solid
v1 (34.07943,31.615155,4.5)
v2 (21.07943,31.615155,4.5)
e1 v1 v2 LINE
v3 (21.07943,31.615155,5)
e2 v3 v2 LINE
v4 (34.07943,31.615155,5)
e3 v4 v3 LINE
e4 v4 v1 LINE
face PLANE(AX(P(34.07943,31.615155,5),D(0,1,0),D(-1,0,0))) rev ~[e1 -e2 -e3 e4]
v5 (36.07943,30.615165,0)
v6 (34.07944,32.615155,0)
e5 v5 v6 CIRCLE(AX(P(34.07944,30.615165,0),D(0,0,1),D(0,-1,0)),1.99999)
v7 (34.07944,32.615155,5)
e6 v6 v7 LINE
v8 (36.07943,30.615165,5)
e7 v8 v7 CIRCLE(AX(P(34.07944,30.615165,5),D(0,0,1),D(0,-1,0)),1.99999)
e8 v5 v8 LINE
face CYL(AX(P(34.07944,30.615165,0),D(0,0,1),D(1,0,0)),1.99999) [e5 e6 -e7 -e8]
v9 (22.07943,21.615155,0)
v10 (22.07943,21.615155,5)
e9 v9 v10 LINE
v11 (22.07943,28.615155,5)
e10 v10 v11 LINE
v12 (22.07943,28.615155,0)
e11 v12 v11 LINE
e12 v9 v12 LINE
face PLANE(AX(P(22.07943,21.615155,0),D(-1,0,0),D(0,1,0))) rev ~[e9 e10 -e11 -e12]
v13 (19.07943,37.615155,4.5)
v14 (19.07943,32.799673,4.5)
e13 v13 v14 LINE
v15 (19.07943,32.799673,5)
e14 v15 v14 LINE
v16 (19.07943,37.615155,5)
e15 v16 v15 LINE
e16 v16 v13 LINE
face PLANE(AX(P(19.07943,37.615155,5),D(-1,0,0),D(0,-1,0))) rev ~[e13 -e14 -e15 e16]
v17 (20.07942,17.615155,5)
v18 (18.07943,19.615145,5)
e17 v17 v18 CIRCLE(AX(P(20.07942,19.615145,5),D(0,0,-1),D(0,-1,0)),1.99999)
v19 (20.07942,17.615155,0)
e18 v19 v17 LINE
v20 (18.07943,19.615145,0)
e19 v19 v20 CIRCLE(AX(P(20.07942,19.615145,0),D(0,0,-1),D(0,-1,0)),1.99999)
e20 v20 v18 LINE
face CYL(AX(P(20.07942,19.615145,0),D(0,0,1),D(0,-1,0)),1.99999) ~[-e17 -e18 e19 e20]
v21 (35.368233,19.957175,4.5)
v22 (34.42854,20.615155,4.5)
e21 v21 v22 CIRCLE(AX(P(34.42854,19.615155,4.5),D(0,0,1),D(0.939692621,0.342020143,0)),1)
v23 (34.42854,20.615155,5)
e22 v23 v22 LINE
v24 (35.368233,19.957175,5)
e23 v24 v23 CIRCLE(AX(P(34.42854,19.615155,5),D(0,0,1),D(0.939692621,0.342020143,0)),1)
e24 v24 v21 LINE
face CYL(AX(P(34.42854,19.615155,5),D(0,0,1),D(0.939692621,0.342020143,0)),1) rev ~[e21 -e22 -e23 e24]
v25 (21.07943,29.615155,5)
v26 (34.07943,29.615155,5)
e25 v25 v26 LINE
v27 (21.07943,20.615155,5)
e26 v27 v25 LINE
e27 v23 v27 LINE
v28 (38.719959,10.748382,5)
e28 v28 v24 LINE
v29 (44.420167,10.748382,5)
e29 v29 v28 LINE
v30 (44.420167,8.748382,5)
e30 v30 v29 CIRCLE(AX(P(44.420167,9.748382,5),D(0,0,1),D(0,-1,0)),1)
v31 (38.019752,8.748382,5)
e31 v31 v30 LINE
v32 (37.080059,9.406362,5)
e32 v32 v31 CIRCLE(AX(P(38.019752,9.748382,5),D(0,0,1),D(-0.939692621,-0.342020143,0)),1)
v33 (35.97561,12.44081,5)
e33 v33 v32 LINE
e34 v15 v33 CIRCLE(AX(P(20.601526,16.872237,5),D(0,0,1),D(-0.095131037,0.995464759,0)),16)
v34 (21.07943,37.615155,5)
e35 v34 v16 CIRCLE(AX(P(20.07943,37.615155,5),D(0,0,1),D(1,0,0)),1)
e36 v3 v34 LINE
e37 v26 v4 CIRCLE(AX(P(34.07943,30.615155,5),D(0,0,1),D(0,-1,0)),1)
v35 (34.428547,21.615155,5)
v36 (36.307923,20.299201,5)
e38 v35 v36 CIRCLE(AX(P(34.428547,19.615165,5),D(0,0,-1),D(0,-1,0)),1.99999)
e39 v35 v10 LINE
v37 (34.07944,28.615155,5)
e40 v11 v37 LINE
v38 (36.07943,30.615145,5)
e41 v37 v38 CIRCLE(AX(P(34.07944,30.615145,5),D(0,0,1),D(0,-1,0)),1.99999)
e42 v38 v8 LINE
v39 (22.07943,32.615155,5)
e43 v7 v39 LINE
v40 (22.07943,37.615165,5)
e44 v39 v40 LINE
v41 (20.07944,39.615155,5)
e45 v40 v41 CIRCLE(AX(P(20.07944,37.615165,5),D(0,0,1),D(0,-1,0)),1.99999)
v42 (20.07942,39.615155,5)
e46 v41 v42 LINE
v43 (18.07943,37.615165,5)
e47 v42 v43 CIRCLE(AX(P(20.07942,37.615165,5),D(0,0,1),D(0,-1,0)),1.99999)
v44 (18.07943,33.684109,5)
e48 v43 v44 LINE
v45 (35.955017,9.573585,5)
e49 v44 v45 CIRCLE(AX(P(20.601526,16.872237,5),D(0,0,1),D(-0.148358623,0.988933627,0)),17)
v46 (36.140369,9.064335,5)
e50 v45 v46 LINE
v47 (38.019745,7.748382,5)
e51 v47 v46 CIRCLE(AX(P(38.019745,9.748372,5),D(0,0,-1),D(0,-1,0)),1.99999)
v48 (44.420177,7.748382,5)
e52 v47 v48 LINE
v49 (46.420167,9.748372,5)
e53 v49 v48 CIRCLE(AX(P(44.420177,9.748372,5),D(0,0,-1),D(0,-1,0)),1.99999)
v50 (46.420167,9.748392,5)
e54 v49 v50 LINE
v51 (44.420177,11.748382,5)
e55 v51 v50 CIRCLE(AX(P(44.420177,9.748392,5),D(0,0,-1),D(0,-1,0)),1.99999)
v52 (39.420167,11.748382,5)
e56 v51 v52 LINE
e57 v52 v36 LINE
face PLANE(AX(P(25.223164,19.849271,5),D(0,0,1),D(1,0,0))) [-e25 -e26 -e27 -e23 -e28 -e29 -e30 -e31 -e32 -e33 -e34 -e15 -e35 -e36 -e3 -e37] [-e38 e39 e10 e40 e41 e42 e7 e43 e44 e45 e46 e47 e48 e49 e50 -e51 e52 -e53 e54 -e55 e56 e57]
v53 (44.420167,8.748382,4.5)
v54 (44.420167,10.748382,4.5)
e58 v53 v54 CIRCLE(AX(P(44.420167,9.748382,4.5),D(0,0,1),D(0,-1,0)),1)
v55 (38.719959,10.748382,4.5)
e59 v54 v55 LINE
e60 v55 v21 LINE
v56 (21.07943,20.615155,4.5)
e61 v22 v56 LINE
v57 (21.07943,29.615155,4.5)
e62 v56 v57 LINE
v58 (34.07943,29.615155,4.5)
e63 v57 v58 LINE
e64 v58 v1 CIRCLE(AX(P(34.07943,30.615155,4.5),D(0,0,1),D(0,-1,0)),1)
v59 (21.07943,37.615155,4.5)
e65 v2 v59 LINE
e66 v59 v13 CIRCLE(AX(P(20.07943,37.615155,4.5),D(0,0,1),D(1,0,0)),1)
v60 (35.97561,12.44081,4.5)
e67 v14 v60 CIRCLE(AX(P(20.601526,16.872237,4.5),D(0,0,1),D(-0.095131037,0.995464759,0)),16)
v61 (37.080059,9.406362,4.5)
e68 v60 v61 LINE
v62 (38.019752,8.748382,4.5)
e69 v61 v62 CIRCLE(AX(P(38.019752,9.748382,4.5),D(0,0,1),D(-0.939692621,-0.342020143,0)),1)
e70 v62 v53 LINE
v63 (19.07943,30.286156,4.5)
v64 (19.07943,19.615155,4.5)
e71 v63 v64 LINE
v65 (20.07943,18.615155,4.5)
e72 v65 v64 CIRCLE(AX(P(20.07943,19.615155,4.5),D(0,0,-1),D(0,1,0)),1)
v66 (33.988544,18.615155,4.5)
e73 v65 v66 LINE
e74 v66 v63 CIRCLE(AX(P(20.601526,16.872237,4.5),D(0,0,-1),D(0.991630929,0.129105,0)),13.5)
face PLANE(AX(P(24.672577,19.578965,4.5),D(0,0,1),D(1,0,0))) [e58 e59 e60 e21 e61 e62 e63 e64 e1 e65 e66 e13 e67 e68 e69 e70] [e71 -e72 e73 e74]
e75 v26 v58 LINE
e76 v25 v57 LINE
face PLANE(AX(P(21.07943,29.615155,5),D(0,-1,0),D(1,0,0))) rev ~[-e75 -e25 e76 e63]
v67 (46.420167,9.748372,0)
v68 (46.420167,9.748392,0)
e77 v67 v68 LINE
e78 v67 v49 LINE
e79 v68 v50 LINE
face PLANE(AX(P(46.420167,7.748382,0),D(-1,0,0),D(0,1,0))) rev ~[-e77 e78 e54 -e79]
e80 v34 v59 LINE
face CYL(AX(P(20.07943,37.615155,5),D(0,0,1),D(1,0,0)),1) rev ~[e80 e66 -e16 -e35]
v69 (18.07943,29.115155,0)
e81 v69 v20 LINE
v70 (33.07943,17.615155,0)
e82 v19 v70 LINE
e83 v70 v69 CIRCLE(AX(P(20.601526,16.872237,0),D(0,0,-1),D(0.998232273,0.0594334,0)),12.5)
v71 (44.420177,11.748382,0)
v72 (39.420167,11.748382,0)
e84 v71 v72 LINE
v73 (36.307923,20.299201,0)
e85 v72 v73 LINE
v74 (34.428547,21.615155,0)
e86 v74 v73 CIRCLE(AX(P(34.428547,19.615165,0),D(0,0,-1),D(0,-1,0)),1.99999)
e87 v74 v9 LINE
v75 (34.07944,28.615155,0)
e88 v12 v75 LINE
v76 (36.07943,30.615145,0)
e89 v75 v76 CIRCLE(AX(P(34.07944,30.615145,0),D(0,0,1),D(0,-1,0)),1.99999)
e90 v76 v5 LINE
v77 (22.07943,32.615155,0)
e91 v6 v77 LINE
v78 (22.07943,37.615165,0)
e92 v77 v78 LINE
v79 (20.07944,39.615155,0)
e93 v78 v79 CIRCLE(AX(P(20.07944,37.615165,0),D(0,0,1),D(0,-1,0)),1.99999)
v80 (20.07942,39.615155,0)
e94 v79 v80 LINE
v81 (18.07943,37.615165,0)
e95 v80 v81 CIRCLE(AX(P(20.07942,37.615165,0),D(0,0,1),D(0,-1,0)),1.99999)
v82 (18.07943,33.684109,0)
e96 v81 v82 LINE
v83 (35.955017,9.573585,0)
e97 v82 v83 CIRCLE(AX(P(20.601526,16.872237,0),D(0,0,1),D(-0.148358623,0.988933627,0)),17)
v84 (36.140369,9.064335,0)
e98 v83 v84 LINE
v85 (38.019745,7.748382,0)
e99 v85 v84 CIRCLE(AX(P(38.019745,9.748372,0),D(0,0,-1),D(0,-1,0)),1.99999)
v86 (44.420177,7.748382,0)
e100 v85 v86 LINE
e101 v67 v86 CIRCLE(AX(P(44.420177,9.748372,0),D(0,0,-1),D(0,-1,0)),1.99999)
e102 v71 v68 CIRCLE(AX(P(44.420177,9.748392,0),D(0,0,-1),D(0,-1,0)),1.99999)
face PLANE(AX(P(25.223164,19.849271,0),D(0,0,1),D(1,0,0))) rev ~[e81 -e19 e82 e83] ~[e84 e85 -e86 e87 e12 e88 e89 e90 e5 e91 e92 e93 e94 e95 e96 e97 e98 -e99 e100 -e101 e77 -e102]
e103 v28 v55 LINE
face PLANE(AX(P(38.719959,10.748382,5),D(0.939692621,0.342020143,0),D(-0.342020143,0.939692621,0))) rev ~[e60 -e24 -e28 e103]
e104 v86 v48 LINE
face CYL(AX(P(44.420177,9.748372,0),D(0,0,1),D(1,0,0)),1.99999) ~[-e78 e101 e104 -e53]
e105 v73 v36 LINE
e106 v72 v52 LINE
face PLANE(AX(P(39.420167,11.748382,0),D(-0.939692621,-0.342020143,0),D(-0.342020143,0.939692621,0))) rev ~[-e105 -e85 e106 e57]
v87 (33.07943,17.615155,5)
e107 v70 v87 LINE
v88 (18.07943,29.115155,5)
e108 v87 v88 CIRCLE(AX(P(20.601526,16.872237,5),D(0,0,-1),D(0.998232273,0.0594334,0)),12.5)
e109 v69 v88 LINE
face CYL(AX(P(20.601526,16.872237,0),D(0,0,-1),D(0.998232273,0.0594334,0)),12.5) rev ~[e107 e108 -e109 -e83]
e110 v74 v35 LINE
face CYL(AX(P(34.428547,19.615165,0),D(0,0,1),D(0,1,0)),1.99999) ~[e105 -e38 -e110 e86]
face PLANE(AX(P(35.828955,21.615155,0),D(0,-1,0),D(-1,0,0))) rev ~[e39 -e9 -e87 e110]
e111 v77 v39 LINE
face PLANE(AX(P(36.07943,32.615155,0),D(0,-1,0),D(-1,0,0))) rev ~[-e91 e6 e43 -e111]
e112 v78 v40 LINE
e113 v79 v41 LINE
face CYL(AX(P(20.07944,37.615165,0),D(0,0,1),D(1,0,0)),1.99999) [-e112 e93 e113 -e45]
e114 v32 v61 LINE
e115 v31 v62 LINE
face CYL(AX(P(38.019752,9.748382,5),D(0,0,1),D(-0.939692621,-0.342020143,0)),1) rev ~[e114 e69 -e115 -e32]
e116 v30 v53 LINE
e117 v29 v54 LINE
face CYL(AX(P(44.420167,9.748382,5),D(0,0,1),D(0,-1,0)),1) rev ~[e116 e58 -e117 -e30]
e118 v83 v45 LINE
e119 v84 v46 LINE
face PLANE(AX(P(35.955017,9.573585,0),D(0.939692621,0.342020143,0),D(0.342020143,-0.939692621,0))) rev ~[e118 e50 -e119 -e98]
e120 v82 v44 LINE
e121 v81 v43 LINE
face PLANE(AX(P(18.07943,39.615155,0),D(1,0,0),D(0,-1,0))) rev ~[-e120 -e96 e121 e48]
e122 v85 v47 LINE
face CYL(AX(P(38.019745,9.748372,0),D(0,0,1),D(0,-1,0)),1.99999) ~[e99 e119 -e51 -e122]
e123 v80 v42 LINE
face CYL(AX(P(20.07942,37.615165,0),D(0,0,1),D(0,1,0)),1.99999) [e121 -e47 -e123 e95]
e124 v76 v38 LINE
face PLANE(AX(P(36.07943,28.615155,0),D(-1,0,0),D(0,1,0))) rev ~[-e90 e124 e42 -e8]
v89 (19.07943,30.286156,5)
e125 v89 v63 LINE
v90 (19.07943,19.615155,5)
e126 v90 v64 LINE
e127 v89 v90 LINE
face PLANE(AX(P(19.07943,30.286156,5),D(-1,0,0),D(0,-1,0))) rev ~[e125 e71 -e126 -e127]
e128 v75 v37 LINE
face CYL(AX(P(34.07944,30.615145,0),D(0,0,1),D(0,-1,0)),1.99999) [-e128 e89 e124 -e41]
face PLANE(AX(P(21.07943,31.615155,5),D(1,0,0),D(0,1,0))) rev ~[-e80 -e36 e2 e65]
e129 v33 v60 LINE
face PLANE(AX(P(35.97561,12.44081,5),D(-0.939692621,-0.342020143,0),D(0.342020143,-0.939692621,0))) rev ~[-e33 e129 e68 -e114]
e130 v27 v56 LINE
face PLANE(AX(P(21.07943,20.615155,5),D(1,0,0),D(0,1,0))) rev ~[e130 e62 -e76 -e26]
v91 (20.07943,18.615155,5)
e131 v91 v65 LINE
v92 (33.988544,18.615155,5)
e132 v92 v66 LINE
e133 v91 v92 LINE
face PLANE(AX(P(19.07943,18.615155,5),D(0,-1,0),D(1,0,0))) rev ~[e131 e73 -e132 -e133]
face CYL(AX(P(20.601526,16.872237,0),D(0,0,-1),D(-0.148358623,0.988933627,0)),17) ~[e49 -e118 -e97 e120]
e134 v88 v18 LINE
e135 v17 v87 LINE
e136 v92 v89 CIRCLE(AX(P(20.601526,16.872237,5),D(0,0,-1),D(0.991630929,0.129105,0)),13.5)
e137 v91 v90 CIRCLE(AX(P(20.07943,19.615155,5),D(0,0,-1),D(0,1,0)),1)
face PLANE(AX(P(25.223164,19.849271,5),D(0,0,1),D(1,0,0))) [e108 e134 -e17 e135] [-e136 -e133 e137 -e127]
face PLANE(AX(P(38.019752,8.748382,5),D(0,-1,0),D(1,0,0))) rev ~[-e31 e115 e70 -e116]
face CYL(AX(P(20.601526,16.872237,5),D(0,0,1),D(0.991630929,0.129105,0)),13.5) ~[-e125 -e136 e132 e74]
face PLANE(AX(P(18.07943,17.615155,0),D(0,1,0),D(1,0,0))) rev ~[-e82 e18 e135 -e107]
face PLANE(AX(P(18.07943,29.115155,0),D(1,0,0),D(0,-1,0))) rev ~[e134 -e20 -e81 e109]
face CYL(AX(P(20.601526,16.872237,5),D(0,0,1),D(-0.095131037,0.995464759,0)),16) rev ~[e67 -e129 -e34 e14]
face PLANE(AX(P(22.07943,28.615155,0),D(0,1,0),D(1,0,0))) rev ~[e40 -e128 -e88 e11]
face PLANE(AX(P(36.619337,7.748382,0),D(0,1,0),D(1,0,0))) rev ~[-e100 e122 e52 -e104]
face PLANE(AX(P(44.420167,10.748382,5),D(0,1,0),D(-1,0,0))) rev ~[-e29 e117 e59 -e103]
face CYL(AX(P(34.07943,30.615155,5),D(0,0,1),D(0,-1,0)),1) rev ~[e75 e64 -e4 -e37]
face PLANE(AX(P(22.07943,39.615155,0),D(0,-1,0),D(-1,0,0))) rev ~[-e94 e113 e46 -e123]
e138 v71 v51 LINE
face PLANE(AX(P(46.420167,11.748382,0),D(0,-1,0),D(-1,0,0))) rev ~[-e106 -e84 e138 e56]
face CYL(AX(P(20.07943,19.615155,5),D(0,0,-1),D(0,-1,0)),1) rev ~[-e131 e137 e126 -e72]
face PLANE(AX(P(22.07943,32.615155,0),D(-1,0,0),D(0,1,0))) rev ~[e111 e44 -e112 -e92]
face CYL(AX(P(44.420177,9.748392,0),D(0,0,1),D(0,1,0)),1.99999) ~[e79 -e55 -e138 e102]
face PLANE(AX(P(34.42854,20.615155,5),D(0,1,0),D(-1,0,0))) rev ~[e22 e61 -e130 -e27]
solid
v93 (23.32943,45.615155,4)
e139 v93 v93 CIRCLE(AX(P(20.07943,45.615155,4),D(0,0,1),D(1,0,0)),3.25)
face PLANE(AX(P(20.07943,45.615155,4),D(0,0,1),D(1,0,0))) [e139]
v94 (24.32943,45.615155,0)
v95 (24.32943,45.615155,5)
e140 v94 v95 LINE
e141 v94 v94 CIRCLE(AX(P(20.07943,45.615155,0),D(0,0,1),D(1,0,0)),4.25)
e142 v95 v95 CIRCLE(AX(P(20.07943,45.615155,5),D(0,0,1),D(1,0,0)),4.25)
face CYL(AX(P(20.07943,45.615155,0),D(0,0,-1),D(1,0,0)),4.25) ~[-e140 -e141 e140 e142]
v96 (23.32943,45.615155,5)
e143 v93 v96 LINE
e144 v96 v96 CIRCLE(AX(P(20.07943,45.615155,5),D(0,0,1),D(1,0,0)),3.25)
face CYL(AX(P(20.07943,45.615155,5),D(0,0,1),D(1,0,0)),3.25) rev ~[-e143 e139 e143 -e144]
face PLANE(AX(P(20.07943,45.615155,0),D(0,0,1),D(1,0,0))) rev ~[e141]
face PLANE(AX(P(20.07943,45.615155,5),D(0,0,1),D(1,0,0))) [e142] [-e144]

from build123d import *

# Parameters (mm, degrees)
F1_DEPTH = 5
F0_R     = 4.25
F2_R     = 1.99999
F3_R     = 3.25
F4_DEPTH = 0.5
F5_R     = 1
F6_R     = 3.25
F7_DEPTH = 1


# Not quite as in the source:
# - a fillet or chamfer is up to 0.001 mm smaller than in the source, because OpenCascade refuses the exact size


with BuildPart() as f1:
    # F0 (on Top) → F1 (new body)
    with BuildSketch(Plane.XY):
        with BuildLine():
            Line((35.8289553412, 21.6151545151), (22.0794297924, 21.6151545151))
            Line((22.0794297924, 21.6151545151), (22.0794297924, 28.6151545151))
            Line((22.0794297924, 28.6151545151), (36.0794297924, 28.6151545151))
            Line((36.0794297924, 28.6151545151), (36.0794297924, 32.6151545151))
            Line((36.0794297924, 32.6151545151), (22.0794297924, 32.6151545151))
            Line((22.0794297924, 32.6151545151), (22.0794297924, 39.6151545151))
            Line((22.0794297924, 39.6151545151), (18.0794297924, 39.6151545151))
            Line((18.0794297924, 39.6151545151), (18.0794297924, 33.6841086822))
            ThreePointArc((18.0794297924, 33.6841086822), (6.9453736492, 6.7475398575), (35.9550171357, 9.5735849806))
            Line((35.9550171357, 9.5735849806), (36.6193366933, 7.7483819969))
            Line((36.6193366933, 7.7483819969), (46.4201668461, 7.7483819969))
            Line((46.4201668461, 7.7483819969), (46.4201668461, 11.7483819969))
            Line((46.4201668461, 11.7483819969), (39.4201668461, 11.7483819969))
            Line((39.4201668461, 11.7483819969), (35.8289553412, 21.6151545151))
        make_face()
        with BuildLine():
            ThreePointArc((33.0794297924, 17.6151545151), (12.9961320833, 6.9521575032), (18.0794297924, 29.1151545151))
            Line((18.0794297924, 29.1151545151), (18.0794297924, 17.6151545151))
            Line((18.0794297924, 17.6151545151), (33.0794297924, 17.6151545151))
        make_face(mode=Mode.SUBTRACT)
    extrude(amount=F1_DEPTH)

    # F2 (radius 2 in the source; OpenCascade refuses exactly that, so slightly less here)
    f2_edges = [f1.edges().sort_by_distance(p)[0] for p in [
        (18.07943, 39.615155, 2.5),
        (22.07943, 39.615155, 2.5),
        (35.828955, 21.615155, 2.5),
        (36.07943, 28.615155, 2.5),
        (36.07943, 32.615155, 2.5),
        (46.420167, 11.748382, 2.5),
        (46.420167, 7.748382, 2.5),
        (18.07943, 17.615155, 2.5),
        (36.619337, 7.748382, 2.5),
    ]]
    fillet(f2_edges, radius=F2_R)


with BuildPart() as f1b:
    # F0 (on Top) → F1, piece 2 (new body)
    with BuildSketch(Plane.XY):
        with Locations((20.0794297924, 45.6151545151)):
            Circle(F0_R)
    extrude(amount=F1_DEPTH)


with BuildPart() as f4_tool:
    # F3 (on face) → F4 (new body)
    with BuildSketch(Plane.XY.offset(5)):
        with BuildLine():
            Line((19.0794297924, 37.6151545151), (19.0794297924, 32.799673159))
            ThreePointArc((19.0794297924, 32.799673159), (8.2893286135, 6.654126324), (35.975610287, 12.4408101625))
            Line((35.975610287, 12.4408101625), (37.0800591489, 9.4063618536))
            ThreePointArc((37.0800591489, 9.4063618536), (37.4461753333, 8.9292299526), (38.0197517697, 8.7483819969))
            Line((38.0197517697, 8.7483819969), (44.4201668461, 8.7483819969))
            ThreePointArc((44.4201668461, 8.7483819969), (45.4201668461, 9.7483819969), (44.4201668461, 10.7483819969))
            Line((44.4201668461, 10.7483819969), (38.7199593079, 10.7483819969))
            Line((38.7199593079, 10.7483819969), (35.3682328855, 19.9571746585))
            ThreePointArc((35.3682328855, 19.9571746585), (35.0021167011, 20.4343065594), (34.4285402648, 20.6151545151))
            Line((34.4285402648, 20.6151545151), (21.0794297924, 20.6151545151))
            Line((21.0794297924, 20.6151545151), (21.0794297924, 29.6151545151))
            Line((21.0794297924, 29.6151545151), (34.0794297924, 29.6151545151))
            ThreePointArc((34.0794297924, 29.6151545151), (35.0794297924, 30.6151545151), (34.0794297924, 31.6151545151))
            Line((34.0794297924, 31.6151545151), (21.0794297924, 31.6151545151))
            Line((21.0794297924, 31.6151545151), (21.0794297924, 37.6151545151))
            ThreePointArc((21.0794297924, 37.6151545151), (20.0794297924, 38.6151545151), (19.0794297924, 37.6151545151))
        make_face()
        with BuildLine():
            ThreePointArc((33.9885439185, 18.6151545151), (12.2800387641, 6.2419574428), (19.0794297924, 30.2861559837))
            Line((19.0794297924, 30.2861559837), (19.0794297924, 18.6151545151))
            Line((19.0794297924, 18.6151545151), (33.9885439185, 18.6151545151))
        make_face(mode=Mode.SUBTRACT)
        with Locations((20.0794297924, 45.6151545151)):
            Circle(F3_R)
    extrude(amount=-F4_DEPTH)


with BuildPart() as f1_1:
    add(f1.part)

    # F4: cut by f4_tool
    add(f4_tool.part, mode=Mode.SUBTRACT)

    # F5
    f5_edges = [f1_1.edges().sort_by_distance(p)[0] for p in [
        (19.07943, 18.615155, 4.75),
    ]]
    fillet(f5_edges, radius=F5_R)


with BuildPart() as f1b_1:
    add(f1b.part)

    # F4: cut by f4_tool
    add(f4_tool.part, mode=Mode.SUBTRACT)

    # F6 (on face) → F7 (cut)
    with BuildSketch(Plane.XY.offset(5)):
        with Locations((20.0794297924, 45.6151545151)):
            Circle(F6_R)
    extrude(amount=-F7_DEPTH, mode=Mode.SUBTRACT)


solid = Compound([f1_1.part, f1b_1.part])
